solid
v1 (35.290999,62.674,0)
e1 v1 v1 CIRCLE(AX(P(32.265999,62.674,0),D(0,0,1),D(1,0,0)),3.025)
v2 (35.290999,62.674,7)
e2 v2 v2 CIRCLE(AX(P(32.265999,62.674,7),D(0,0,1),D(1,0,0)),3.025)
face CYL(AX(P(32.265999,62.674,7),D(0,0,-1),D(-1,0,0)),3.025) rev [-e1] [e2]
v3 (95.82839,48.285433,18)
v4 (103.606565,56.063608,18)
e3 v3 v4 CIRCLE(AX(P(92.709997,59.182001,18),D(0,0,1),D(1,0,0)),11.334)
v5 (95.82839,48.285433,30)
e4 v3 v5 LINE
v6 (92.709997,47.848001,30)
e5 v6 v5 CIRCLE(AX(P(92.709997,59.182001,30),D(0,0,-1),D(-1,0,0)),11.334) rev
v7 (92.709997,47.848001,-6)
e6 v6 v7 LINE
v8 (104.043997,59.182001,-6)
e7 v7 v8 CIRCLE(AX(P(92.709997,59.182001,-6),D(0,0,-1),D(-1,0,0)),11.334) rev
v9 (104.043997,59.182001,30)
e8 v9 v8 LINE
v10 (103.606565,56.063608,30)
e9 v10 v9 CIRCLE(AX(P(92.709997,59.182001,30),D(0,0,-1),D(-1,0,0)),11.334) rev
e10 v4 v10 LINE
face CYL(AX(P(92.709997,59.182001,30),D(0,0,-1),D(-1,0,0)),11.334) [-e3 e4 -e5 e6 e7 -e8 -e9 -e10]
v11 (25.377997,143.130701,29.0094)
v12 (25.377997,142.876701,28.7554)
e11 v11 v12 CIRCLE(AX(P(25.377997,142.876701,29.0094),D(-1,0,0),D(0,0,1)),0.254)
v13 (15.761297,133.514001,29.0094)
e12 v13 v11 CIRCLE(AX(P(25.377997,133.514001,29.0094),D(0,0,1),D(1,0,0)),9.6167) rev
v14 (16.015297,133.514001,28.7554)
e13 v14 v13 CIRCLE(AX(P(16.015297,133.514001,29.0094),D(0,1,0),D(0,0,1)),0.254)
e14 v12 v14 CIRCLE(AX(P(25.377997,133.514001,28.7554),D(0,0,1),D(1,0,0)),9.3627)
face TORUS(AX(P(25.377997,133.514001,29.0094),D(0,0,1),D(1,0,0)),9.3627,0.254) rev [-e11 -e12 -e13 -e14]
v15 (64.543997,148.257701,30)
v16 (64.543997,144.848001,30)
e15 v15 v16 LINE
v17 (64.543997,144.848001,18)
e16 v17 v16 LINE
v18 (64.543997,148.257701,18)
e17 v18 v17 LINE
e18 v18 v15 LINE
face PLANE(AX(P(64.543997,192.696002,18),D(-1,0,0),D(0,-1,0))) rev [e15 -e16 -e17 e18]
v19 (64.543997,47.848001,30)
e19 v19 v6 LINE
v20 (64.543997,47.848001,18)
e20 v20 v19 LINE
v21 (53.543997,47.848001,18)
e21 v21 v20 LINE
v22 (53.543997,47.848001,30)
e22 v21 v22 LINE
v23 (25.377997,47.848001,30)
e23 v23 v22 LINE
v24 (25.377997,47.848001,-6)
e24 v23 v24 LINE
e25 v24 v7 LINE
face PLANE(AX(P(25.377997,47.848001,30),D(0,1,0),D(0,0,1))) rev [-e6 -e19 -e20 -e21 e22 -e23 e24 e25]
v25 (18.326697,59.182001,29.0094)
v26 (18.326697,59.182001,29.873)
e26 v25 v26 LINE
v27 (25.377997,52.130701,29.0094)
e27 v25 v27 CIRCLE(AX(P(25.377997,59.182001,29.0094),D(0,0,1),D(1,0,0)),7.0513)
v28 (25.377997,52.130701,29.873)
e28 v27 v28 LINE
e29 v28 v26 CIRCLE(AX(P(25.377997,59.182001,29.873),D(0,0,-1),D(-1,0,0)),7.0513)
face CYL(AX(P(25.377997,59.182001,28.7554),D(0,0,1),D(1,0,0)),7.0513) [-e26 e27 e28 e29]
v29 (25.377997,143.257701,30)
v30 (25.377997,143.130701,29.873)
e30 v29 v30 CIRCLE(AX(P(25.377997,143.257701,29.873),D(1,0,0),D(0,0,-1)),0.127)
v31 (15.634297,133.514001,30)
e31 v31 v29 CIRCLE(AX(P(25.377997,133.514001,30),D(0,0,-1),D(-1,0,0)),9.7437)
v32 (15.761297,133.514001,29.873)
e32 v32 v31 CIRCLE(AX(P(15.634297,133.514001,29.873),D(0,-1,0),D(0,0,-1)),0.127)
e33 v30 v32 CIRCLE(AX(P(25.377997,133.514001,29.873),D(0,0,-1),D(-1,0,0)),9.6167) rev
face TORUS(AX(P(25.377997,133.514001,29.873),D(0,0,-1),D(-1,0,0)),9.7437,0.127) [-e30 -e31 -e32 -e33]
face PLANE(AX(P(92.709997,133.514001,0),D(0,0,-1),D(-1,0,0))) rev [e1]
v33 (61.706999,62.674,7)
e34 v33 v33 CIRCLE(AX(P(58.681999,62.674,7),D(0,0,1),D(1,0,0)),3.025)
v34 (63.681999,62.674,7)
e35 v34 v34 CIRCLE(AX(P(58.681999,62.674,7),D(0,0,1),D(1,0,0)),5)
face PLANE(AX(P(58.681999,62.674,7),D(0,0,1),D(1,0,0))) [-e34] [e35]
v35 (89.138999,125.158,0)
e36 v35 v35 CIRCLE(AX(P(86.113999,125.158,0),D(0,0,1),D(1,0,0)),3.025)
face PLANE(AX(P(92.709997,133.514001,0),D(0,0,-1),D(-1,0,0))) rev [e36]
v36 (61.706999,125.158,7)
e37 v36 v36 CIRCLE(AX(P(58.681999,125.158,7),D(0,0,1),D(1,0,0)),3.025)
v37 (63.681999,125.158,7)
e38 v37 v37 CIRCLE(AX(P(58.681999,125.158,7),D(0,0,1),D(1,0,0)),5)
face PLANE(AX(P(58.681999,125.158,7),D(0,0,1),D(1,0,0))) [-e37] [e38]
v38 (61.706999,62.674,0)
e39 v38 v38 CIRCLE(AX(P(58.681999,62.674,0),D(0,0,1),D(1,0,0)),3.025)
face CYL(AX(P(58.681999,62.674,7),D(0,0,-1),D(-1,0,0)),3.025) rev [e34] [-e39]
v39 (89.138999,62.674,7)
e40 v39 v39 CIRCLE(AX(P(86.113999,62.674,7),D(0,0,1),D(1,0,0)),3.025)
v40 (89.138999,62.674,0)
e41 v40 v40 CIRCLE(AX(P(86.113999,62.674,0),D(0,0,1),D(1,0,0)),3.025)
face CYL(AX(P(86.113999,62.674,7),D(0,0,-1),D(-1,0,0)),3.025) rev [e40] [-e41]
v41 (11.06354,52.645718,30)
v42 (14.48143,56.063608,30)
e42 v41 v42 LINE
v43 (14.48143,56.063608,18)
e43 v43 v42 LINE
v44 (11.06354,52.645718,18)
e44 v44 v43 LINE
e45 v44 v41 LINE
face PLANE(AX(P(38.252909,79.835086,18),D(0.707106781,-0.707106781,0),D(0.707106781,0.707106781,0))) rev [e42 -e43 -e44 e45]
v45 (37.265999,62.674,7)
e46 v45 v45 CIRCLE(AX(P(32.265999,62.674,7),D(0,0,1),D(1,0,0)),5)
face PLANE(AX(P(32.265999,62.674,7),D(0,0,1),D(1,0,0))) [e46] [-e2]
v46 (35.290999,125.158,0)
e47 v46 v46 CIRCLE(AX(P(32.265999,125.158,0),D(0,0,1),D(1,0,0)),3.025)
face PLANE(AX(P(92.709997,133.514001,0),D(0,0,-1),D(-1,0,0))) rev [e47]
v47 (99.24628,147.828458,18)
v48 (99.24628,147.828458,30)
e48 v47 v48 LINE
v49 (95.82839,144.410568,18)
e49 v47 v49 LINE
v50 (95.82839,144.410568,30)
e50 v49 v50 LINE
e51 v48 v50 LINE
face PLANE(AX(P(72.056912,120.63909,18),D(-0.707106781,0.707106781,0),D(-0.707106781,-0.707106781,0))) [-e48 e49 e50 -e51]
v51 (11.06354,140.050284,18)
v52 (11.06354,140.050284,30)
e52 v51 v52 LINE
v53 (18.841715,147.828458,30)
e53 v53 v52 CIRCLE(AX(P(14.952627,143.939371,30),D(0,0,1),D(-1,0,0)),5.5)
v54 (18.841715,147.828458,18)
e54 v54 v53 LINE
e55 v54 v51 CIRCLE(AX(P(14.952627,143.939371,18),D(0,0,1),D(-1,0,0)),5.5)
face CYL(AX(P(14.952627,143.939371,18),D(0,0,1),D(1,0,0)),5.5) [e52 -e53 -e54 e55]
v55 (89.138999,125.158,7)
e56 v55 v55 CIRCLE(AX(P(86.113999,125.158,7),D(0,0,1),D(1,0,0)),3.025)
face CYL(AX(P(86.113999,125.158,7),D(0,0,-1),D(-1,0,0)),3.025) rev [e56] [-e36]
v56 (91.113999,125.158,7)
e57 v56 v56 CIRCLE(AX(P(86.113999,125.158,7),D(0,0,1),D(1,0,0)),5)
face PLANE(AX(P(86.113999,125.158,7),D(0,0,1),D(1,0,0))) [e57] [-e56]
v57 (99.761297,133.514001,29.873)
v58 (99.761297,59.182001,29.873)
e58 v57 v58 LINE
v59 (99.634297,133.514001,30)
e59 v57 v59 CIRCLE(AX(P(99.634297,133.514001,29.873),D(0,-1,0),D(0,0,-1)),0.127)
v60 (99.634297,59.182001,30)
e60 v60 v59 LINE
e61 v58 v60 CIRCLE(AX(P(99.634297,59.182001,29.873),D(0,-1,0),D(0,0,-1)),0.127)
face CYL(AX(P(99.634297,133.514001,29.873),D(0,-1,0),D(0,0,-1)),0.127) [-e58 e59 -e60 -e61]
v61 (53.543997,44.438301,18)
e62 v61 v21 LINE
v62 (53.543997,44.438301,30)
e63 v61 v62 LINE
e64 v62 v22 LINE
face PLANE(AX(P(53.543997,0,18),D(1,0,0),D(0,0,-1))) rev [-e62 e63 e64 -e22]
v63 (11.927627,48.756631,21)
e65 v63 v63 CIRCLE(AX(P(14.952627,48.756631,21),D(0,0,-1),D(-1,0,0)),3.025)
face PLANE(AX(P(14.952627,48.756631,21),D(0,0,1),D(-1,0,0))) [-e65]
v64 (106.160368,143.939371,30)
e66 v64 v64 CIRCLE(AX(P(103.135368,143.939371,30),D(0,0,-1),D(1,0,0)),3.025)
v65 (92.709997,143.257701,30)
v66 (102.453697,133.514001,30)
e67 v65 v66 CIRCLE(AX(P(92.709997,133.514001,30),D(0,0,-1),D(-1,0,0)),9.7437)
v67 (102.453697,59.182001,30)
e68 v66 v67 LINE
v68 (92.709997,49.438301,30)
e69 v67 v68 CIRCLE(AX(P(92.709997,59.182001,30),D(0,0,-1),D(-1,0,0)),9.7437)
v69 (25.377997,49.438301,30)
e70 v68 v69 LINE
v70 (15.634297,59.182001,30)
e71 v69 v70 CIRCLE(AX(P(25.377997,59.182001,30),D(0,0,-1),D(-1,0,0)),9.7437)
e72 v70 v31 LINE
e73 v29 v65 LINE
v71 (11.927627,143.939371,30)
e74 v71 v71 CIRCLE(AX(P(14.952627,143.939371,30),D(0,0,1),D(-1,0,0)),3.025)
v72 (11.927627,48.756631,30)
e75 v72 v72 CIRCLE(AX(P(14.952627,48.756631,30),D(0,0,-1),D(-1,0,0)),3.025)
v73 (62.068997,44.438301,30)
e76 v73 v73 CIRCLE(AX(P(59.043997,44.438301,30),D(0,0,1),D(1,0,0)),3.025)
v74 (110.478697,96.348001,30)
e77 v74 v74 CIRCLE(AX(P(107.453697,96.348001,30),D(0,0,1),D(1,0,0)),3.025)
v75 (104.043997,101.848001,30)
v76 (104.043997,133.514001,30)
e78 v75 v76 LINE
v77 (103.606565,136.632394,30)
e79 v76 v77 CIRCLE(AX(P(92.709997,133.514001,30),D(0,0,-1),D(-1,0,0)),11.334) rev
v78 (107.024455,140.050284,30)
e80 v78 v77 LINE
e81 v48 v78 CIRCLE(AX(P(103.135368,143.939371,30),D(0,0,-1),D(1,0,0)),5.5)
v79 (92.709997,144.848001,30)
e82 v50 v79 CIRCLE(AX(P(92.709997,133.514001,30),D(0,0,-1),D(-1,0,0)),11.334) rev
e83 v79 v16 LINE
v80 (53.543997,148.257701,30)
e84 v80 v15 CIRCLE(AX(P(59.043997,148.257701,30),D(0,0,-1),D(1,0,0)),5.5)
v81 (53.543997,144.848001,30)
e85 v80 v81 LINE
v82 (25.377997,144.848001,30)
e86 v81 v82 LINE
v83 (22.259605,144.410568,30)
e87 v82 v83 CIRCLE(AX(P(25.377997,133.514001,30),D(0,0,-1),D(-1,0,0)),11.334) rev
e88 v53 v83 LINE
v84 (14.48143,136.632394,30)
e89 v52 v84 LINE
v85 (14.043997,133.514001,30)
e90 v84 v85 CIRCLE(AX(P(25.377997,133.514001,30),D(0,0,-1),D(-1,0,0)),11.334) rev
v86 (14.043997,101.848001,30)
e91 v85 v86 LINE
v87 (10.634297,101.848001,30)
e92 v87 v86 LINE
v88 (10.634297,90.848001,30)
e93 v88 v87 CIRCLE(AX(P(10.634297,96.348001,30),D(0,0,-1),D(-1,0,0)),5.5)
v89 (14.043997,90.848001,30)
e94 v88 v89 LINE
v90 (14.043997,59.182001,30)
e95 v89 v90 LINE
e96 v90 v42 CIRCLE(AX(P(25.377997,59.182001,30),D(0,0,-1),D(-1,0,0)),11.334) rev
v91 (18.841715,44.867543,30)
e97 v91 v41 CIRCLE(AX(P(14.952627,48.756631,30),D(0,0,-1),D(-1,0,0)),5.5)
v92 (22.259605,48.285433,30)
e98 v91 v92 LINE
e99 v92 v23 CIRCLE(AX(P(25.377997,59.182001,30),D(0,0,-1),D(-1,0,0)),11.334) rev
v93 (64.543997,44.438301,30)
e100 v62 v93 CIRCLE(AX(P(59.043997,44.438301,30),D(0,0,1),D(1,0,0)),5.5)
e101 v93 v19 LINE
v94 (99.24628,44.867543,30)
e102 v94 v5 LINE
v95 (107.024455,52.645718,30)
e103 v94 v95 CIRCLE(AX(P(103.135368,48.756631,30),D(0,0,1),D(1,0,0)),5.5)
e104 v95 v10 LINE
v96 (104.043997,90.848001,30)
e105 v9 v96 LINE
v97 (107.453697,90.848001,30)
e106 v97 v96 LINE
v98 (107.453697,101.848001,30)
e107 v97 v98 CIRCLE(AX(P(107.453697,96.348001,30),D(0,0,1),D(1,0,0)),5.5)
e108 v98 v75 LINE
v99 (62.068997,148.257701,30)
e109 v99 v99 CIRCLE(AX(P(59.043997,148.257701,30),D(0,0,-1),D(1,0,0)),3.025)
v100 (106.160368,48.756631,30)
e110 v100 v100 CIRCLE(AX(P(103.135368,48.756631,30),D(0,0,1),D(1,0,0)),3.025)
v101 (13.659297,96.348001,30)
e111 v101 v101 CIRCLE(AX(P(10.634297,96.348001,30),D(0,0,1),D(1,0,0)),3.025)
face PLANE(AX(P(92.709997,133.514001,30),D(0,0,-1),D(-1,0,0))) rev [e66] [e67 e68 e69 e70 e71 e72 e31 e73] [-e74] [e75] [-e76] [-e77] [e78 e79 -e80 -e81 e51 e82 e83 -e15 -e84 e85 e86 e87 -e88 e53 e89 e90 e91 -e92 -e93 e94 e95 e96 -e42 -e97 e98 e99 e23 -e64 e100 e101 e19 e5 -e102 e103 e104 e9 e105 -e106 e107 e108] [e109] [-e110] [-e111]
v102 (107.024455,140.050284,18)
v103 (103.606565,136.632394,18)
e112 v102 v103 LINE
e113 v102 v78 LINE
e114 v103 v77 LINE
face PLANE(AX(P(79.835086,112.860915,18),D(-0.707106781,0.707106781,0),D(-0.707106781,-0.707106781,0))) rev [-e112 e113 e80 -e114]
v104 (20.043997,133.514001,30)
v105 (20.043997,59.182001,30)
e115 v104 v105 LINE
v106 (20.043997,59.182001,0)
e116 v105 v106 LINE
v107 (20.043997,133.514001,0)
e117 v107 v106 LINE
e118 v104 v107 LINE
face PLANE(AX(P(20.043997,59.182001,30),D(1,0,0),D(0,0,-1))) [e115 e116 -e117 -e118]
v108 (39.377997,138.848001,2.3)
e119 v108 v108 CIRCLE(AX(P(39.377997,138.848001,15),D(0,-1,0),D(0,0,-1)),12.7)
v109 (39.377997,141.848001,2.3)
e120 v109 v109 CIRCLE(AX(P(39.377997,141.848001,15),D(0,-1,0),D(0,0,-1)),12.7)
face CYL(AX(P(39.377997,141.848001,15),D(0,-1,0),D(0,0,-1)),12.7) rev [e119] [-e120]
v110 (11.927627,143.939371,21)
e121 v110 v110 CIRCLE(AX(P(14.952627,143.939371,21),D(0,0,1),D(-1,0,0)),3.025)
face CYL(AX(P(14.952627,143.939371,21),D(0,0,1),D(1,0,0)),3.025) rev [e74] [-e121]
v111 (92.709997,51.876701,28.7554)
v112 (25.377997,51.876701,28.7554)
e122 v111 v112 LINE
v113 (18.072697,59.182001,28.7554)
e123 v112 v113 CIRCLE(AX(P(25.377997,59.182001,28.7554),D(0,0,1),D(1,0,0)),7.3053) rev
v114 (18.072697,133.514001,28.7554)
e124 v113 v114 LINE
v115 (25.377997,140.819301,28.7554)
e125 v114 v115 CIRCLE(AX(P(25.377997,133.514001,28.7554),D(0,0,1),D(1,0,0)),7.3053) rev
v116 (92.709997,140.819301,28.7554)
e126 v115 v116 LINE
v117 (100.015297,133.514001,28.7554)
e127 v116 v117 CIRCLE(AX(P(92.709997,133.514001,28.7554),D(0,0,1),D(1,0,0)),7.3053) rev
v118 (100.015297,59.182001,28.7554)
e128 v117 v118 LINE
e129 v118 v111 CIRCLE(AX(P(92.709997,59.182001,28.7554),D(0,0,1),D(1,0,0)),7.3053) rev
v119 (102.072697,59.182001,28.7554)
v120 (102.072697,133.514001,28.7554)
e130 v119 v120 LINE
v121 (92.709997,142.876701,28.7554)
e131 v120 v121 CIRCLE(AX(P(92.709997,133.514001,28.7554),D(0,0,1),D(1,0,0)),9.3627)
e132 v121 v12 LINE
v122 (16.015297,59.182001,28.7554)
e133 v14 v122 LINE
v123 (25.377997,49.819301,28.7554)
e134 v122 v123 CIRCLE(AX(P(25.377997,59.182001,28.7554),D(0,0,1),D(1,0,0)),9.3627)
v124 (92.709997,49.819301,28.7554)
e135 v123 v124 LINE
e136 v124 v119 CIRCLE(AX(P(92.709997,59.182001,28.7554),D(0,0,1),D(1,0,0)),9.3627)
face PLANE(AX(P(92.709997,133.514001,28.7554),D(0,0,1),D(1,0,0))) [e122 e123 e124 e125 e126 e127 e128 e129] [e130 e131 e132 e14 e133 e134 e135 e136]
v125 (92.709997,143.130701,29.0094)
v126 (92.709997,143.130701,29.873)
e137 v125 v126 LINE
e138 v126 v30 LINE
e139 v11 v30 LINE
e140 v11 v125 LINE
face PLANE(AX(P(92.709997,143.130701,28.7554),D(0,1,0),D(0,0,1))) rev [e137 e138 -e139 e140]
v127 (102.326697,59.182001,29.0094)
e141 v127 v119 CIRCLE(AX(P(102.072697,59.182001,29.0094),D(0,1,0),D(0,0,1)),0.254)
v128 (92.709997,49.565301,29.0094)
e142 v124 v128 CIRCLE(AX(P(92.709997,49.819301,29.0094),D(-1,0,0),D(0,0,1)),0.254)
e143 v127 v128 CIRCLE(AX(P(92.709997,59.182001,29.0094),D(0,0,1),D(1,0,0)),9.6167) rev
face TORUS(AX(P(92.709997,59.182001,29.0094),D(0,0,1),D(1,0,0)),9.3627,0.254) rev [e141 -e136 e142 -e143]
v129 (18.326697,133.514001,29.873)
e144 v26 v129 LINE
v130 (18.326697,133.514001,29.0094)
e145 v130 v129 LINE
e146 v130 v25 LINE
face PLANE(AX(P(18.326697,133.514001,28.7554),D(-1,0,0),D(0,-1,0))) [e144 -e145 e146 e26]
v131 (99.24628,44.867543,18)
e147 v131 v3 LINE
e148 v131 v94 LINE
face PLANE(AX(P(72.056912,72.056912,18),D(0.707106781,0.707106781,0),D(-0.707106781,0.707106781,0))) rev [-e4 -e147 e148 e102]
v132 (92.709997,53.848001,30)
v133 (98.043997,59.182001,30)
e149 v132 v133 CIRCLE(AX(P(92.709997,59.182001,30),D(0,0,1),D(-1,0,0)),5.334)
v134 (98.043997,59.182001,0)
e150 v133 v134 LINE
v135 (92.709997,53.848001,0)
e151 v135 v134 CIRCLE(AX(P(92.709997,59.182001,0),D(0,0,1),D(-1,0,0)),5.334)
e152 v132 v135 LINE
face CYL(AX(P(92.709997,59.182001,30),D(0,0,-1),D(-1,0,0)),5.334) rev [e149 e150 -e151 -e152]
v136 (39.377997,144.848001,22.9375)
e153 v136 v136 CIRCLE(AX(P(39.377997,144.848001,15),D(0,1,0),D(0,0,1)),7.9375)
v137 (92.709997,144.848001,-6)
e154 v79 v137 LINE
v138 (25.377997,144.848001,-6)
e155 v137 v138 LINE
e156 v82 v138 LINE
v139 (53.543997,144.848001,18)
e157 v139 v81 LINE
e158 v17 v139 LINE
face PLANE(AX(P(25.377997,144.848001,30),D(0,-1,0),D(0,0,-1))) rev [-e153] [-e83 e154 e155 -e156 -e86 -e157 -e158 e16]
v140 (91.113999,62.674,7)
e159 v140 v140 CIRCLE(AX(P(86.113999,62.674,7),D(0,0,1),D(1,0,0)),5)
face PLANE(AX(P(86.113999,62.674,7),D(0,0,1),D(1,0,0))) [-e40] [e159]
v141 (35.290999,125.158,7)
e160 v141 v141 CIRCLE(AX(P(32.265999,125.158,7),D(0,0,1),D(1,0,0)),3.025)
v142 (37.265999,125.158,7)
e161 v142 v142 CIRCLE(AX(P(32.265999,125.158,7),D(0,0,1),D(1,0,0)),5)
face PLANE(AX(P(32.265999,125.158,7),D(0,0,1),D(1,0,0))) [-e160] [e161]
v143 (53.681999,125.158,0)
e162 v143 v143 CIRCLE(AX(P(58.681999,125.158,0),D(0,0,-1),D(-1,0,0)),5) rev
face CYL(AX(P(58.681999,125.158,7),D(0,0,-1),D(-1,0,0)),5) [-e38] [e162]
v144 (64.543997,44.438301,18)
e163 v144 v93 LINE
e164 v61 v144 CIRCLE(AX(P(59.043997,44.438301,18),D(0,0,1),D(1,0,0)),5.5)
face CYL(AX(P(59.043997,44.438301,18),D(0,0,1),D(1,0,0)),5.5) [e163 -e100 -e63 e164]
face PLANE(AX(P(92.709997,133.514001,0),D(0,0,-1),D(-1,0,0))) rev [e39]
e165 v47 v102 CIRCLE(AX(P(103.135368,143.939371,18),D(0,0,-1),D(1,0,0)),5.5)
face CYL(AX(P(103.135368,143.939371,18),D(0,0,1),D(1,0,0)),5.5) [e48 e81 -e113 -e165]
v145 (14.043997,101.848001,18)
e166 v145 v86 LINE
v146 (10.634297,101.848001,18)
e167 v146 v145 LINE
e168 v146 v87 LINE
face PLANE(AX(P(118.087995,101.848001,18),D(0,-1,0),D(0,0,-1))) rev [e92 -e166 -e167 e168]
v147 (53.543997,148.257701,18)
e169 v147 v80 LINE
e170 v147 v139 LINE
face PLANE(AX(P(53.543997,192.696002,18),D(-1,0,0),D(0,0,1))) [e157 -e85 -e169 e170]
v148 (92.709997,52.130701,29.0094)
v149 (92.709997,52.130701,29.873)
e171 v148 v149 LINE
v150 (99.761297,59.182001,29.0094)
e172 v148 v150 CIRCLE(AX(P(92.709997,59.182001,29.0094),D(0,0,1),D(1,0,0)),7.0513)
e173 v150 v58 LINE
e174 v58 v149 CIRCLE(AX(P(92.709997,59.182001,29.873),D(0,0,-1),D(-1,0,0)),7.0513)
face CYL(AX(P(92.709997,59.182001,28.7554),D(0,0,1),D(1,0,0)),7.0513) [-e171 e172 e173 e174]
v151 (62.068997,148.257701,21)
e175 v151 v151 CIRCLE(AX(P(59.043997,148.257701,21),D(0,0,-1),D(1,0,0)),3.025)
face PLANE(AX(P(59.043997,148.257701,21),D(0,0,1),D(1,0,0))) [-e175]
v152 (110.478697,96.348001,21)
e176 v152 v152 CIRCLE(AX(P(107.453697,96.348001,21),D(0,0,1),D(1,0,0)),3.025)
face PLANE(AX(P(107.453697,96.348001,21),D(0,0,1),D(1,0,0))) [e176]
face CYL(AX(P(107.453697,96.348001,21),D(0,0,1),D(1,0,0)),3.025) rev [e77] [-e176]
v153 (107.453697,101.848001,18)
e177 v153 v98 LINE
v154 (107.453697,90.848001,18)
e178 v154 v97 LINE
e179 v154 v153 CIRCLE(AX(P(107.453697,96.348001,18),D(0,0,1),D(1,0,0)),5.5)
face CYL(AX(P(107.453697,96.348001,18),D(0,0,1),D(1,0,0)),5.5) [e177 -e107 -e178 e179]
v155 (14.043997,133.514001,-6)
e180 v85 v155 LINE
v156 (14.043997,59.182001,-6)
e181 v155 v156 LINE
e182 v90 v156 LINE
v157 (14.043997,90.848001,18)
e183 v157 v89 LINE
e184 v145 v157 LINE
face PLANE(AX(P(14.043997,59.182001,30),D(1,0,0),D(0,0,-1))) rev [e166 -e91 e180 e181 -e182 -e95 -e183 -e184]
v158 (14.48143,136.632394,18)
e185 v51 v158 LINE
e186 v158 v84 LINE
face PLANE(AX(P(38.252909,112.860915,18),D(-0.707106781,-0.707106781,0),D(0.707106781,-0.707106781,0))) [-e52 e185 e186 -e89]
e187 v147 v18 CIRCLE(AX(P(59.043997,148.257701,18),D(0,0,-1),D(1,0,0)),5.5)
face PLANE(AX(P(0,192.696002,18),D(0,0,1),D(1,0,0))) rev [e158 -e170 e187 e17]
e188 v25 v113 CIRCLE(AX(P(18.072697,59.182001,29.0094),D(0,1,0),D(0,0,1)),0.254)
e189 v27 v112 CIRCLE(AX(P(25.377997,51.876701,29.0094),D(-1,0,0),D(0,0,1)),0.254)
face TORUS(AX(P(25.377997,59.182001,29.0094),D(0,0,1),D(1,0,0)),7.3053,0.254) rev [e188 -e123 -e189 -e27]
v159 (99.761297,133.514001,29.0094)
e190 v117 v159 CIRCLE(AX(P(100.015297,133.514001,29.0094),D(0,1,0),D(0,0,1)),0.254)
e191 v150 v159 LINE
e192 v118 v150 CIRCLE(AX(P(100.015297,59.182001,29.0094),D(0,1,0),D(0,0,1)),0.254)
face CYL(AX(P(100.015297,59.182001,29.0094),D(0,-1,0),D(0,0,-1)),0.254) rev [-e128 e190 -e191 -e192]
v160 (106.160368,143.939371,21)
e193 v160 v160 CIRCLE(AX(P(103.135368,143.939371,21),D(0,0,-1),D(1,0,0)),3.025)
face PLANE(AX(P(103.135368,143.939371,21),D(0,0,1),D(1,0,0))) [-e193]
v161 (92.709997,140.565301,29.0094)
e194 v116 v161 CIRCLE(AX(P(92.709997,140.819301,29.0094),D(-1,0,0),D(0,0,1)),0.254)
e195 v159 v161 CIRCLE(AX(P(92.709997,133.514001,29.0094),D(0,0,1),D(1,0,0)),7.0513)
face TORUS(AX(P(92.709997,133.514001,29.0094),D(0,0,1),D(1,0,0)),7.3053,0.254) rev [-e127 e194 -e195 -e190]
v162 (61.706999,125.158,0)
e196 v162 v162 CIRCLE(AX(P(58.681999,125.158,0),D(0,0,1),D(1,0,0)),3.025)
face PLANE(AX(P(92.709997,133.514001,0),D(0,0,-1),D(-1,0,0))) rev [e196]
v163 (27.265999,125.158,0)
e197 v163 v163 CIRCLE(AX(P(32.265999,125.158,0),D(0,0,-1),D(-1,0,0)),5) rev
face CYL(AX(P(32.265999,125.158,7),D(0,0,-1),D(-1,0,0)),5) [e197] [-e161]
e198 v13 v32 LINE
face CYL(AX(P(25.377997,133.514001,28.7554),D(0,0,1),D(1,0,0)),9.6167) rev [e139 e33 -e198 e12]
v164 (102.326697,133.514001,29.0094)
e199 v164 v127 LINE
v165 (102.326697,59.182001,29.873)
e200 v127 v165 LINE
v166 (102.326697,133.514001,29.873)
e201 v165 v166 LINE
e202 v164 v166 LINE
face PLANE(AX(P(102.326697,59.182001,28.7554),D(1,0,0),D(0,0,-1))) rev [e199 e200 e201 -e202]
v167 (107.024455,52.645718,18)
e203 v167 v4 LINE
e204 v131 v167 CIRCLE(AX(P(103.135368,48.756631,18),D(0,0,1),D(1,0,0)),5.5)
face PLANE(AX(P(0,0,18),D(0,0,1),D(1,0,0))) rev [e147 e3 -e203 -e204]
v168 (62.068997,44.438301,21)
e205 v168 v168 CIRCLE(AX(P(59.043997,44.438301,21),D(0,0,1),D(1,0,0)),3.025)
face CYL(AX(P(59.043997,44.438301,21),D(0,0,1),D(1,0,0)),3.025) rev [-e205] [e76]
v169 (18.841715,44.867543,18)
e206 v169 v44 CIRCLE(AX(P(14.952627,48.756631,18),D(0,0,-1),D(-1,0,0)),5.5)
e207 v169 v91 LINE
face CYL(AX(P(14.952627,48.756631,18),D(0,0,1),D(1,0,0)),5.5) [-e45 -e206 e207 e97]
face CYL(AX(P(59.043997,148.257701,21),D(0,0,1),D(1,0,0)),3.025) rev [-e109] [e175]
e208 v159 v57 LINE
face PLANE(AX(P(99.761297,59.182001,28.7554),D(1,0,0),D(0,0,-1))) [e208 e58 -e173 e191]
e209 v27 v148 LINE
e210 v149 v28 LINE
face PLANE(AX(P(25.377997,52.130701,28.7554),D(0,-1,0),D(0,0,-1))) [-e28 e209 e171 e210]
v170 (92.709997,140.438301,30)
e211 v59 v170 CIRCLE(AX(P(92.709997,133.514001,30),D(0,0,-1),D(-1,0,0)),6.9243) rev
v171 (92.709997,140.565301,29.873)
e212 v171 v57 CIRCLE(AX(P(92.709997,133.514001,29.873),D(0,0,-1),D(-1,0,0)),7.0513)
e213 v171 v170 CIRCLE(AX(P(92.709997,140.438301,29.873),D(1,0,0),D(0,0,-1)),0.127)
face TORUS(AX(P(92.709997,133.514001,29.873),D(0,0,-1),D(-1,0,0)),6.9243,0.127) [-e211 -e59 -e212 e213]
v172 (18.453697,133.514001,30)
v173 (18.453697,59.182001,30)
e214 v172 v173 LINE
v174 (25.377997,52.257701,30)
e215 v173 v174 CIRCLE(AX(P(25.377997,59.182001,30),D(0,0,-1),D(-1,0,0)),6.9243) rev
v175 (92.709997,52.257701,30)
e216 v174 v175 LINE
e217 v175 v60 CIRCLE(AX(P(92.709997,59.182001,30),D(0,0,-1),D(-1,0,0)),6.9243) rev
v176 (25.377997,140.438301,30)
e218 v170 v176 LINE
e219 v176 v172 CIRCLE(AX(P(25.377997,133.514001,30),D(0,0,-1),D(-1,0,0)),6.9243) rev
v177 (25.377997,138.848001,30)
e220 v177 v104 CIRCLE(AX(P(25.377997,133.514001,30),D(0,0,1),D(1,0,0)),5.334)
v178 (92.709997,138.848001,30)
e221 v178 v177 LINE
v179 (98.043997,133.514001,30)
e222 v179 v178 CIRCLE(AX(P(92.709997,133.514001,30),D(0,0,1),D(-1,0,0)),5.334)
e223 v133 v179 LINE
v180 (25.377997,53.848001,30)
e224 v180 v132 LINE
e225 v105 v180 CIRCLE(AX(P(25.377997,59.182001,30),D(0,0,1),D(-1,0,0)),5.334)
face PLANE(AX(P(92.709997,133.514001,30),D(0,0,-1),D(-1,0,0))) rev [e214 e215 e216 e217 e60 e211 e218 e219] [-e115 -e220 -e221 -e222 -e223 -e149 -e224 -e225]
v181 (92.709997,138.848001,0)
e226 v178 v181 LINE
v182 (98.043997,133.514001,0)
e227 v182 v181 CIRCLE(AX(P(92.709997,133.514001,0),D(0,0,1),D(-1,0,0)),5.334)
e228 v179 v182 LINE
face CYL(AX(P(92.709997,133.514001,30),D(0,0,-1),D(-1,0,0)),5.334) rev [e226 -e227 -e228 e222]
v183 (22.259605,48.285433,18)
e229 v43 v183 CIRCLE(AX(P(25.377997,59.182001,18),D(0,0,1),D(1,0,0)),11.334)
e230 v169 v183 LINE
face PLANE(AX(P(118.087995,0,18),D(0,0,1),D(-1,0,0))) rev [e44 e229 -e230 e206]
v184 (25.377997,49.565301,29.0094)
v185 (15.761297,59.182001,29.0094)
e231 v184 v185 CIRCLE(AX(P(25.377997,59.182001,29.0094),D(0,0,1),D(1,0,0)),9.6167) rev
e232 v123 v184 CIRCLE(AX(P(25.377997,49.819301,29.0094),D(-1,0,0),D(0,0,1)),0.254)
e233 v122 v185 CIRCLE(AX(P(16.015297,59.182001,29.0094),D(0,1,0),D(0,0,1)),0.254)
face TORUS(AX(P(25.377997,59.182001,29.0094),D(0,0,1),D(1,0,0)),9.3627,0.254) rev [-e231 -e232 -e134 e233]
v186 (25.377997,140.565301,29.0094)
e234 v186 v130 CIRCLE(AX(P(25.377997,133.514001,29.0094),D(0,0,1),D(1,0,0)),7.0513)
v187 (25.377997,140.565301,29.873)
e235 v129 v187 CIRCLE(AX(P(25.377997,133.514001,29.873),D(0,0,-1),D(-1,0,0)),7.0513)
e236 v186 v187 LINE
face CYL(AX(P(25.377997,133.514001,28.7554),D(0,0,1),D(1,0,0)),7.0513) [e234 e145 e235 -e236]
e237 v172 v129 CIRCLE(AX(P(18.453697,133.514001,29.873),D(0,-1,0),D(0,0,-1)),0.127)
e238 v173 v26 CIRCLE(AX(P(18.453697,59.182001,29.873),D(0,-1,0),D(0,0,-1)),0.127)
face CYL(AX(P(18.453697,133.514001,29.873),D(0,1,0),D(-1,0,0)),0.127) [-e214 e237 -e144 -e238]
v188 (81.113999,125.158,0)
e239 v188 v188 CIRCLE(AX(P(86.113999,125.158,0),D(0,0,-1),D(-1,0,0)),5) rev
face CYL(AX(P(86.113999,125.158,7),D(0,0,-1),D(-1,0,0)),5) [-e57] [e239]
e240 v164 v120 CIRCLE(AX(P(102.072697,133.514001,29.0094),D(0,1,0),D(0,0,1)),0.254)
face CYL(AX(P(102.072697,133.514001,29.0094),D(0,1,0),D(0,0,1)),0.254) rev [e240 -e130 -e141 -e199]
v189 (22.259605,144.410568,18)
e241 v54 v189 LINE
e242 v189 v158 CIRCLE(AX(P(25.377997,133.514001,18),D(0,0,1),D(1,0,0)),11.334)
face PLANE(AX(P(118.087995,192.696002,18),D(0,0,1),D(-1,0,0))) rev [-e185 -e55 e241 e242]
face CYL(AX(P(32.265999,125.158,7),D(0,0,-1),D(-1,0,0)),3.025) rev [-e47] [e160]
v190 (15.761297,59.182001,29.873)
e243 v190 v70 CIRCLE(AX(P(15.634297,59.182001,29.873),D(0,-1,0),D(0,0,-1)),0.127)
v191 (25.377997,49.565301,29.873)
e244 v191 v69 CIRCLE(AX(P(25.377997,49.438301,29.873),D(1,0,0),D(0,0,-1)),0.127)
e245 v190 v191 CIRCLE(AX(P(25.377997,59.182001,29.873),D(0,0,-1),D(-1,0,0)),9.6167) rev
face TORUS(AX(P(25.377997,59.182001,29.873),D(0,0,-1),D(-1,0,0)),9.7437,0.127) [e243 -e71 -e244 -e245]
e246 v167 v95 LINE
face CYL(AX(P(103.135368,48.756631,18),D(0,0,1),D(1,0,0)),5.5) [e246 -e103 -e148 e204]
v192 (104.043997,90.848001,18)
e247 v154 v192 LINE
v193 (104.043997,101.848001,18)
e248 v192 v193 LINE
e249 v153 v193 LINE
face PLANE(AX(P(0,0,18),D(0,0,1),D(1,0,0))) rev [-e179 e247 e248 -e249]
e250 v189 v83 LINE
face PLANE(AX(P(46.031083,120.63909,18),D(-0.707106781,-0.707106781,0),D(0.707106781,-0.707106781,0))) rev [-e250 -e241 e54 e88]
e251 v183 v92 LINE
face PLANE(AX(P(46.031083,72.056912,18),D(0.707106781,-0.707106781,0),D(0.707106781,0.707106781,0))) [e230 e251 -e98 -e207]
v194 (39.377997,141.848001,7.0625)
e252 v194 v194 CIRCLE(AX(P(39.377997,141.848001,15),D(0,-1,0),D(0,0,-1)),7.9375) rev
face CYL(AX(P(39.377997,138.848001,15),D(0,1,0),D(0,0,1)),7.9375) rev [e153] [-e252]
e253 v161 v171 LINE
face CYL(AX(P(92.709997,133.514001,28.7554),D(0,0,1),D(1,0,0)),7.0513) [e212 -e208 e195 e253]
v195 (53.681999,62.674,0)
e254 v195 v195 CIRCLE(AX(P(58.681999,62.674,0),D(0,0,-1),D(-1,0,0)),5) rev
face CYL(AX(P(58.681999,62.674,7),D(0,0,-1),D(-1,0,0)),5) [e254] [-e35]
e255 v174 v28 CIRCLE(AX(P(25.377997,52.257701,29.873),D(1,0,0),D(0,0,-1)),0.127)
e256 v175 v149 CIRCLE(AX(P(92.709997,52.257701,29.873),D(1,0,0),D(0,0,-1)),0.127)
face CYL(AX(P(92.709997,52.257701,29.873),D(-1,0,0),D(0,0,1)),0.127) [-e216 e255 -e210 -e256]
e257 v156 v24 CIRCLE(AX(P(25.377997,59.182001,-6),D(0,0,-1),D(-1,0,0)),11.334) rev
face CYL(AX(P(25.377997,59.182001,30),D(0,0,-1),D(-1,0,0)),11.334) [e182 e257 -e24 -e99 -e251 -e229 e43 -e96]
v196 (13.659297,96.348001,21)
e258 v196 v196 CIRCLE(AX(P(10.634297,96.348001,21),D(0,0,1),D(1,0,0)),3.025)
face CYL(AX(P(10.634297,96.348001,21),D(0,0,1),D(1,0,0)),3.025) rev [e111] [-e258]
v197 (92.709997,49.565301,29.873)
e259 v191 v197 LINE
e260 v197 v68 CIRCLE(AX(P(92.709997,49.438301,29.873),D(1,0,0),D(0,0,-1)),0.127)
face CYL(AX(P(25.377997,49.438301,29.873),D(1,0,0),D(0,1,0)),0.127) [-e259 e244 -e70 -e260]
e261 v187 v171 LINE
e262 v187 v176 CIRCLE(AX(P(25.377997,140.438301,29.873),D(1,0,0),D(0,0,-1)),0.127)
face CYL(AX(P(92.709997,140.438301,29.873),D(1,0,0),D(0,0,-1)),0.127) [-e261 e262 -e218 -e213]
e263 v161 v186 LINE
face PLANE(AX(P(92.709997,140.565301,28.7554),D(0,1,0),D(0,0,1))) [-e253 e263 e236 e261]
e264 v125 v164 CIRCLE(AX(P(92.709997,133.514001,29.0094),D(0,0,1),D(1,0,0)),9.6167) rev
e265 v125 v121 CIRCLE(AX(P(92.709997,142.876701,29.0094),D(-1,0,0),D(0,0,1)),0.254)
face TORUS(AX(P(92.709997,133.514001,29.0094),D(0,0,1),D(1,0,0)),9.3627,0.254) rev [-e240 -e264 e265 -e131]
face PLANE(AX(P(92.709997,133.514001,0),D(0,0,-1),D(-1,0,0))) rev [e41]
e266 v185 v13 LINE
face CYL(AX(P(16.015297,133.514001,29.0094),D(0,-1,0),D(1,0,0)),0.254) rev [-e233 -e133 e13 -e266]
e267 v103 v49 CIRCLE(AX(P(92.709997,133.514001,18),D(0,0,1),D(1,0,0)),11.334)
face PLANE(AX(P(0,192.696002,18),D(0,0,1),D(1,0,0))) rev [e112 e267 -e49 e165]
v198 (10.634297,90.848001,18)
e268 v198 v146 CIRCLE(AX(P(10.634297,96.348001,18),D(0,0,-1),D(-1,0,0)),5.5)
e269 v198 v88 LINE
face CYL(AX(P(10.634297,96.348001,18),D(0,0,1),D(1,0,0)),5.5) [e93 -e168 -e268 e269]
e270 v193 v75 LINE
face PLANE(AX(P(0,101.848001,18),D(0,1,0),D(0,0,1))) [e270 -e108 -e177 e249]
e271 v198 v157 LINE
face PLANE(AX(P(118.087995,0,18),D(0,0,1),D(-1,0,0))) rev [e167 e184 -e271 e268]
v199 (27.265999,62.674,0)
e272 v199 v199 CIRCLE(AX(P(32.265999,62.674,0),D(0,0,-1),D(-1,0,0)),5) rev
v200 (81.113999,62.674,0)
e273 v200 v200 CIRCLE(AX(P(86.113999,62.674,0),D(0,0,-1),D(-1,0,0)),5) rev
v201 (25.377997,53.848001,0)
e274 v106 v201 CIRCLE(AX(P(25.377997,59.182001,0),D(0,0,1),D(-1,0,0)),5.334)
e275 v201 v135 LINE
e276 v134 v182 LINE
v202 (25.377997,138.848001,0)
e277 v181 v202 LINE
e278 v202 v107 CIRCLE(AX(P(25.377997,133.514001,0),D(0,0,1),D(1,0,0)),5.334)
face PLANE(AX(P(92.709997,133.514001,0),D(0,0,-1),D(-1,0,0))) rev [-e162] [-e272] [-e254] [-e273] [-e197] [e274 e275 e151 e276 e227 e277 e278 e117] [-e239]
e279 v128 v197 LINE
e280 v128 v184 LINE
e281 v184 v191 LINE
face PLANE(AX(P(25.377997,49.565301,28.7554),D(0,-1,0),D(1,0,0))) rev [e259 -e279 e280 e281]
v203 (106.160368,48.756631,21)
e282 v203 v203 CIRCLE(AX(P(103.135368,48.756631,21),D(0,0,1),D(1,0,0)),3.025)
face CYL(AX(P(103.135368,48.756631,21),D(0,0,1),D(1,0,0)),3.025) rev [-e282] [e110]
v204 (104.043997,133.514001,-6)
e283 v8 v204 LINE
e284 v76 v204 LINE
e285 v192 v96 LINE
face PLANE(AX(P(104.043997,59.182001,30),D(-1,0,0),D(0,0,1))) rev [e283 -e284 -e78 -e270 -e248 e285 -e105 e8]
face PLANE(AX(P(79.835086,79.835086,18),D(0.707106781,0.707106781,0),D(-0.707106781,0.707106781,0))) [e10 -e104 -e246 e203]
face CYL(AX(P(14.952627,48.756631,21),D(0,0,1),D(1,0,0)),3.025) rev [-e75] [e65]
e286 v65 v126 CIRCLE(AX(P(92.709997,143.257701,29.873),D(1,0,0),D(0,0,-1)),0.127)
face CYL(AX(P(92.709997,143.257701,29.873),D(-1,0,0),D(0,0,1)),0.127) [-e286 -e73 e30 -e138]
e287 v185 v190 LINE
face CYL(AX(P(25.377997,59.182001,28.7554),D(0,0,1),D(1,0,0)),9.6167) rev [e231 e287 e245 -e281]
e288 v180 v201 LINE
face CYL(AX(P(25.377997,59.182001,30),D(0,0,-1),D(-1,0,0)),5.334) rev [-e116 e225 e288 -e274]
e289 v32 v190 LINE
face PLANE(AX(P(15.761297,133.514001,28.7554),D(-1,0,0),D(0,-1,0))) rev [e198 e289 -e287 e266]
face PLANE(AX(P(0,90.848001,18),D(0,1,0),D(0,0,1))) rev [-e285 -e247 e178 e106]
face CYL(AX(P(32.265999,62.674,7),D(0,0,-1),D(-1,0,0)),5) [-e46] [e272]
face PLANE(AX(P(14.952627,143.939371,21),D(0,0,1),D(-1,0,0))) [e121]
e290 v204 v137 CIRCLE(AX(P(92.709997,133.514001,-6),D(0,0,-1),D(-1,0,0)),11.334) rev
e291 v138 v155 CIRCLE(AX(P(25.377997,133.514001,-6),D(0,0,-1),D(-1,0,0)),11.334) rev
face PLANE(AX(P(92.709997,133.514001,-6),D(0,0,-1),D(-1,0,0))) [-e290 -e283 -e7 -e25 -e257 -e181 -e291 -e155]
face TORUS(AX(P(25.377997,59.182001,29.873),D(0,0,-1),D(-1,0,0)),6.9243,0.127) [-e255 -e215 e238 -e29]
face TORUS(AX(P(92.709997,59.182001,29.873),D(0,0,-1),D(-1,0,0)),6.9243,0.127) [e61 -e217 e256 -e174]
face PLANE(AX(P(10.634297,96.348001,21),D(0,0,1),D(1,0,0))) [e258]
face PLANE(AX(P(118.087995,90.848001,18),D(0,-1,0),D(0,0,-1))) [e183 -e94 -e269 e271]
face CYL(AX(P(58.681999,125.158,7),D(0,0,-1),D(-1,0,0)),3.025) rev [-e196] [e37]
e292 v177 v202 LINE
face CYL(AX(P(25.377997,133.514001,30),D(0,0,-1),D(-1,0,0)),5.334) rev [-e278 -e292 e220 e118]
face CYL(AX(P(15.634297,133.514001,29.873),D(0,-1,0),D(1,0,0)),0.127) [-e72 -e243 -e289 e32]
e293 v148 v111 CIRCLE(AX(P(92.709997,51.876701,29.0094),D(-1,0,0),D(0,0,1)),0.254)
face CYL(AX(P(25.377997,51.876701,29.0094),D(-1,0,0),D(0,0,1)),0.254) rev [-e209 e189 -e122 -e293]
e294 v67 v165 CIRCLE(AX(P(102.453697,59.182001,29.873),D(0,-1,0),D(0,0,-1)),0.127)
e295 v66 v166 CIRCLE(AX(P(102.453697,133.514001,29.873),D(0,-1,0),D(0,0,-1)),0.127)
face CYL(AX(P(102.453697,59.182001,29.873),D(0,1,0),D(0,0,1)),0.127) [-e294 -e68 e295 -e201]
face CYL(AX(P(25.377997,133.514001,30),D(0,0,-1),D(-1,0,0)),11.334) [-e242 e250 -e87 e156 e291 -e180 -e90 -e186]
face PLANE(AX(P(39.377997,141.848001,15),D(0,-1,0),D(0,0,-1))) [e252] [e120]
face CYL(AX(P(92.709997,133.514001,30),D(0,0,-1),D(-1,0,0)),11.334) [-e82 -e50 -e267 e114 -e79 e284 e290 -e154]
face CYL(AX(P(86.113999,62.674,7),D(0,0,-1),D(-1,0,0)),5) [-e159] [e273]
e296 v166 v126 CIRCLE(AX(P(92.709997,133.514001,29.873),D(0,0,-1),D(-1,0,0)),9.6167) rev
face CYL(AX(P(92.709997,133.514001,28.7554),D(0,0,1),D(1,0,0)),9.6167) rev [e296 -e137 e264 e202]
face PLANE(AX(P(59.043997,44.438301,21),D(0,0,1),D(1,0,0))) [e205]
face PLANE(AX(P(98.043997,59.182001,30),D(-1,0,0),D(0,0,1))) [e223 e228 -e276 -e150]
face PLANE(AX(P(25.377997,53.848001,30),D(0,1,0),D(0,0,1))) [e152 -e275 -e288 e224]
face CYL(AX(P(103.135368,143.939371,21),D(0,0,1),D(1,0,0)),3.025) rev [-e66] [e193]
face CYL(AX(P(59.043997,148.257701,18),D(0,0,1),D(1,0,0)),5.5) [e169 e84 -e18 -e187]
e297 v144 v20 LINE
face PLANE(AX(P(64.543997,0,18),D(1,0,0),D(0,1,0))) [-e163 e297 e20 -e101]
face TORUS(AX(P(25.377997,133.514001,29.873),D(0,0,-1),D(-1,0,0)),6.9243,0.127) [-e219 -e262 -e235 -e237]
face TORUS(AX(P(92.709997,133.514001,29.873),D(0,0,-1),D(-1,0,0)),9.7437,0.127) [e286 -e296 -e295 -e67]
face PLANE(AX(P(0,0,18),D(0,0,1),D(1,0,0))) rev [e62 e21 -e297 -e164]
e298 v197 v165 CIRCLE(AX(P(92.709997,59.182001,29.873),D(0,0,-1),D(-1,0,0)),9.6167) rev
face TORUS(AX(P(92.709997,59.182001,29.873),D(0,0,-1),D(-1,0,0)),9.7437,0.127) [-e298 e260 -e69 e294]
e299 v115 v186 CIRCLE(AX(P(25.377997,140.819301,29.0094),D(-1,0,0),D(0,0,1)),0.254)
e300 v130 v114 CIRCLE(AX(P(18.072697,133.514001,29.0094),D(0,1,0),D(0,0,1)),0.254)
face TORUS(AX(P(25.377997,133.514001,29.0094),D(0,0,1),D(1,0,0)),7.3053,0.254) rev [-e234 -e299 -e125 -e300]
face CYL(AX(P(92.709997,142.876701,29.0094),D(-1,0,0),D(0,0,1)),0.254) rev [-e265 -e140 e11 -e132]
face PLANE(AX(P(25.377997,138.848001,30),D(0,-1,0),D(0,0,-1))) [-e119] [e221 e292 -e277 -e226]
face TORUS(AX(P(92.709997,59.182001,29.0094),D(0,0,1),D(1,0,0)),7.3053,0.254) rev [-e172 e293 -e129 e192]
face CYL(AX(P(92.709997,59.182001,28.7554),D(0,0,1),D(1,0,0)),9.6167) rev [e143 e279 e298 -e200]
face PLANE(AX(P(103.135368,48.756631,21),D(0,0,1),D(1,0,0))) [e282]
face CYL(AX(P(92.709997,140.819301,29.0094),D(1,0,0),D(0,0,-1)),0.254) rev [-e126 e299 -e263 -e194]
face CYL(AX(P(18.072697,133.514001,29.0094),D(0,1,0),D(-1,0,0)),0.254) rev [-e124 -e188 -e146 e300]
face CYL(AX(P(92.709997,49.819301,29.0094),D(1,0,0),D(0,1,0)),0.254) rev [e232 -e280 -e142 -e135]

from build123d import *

# Parameters (mm, degrees)
BOSS_EXTRUDE1_DEPTH     = 30
SHELL1_T                = 6
CUT_EXTRUDE4_DEPTH      = 1.2446
FILLET1_R               = 0.254
FILLET2_R               = 0.127
BOSS_EXTRUDE7_START     = -12
BOSS_EXTRUDE7_DEPTH     = 12
SKETCH17_R              = 3.025
CUT_EXTRUDE5_DEPTH      = 9
MIRROR3_START           = -12
MIRROR3_COPY_1_DEPTH    = 12
MIRROR3_COPY_2_SKETCH_R = 3.025
MIRROR3_COPY_2_DEPTH    = 9
BOSS_EXTRUDE8_DEPTH     = 12
SKETCH19_R              = 3.025
CUT_EXTRUDE6_DEPTH      = 9
BOSS_EXTRUDE9_DEPTH     = 12
SKETCH21_R              = 3.025
CUT_EXTRUDE9_DEPTH      = 9
CUT_EXTRUDE12_DEPTH     = 6
SKETCH28_R              = 5
SKETCH28_R_2            = 3.025
BOSS_EXTRUDE12_DEPTH    = 7
SKETCH29_R              = 12.7
CUT_EXTRUDE13_DEPTH     = 3
SKETCH30_R              = 3.025
CUT_EXTRUDE14_DEPTH     = 9


with BuildPart() as part:
    # Sketch2 → Boss-Extrude1 (new body)
    with BuildSketch(Plane.XY):
        with BuildLine():
            Line((25.377997498, 138.848000793), (92.709997498, 138.848000793))
            ThreePointArc((92.709997498, 138.848000793), (96.481705068, 137.285708364), (98.043997498, 133.514000793))
            Line((98.043997498, 133.514000793), (98.043997498, 59.182000793))
            ThreePointArc((98.043997498, 59.182000793), (96.481705068, 55.410293223), (92.709997498, 53.848000793))
            Line((92.709997498, 53.848000793), (25.377997498, 53.848000793))
            ThreePointArc((25.377997498, 53.848000793), (21.606289927, 55.410293223), (20.043997498, 59.182000793))
            Line((20.043997498, 59.182000793), (20.043997498, 133.514000793))
            ThreePointArc((20.043997498, 133.514000793), (21.606289927, 137.285708364), (25.377997498, 138.848000793))
        make_face()
    extrude(amount=BOSS_EXTRUDE1_DEPTH)

    # Shell1
    shell1_openings = [part.faces().sort_by_distance(p)[0] for p in [
        (59.043997498, 96.348000793, 30),
    ]]
    offset(amount=SHELL1_T, openings=shell1_openings, kind=Kind.INTERSECTION)

    # Sketch15 → Cut-Extrude4 (cut)
    with BuildSketch(Plane.XY.offset(30)):
        with BuildLine():
            Line((92.709997498, 143.130700793), (25.377997498, 143.130700793))
            ThreePointArc((25.377997498, 143.130700793), (18.577963715, 140.314034576), (15.761297498, 133.514000793))
            Line((15.761297498, 133.514000793), (15.761297498, 59.182000793))
            ThreePointArc((15.761297498, 59.182000793), (18.577963715, 52.381967011), (25.377997498, 49.565300793))
            Line((25.377997498, 49.565300793), (92.709997498, 49.565300793))
            ThreePointArc((92.709997498, 49.565300793), (99.51003128, 52.381967011), (102.326697498, 59.182000793))
            Line((102.326697498, 59.182000793), (102.326697498, 133.514000793))
            ThreePointArc((102.326697498, 133.514000793), (99.51003128, 140.314034576), (92.709997498, 143.130700793))
        make_face()
        with BuildLine():
            Line((18.326697498, 133.514000793), (18.326697498, 59.182000793))
            ThreePointArc((18.326697498, 59.182000793), (20.391975451, 54.195978747), (25.377997498, 52.130700793))
            Line((25.377997498, 52.130700793), (92.709997498, 52.130700793))
            ThreePointArc((92.709997498, 52.130700793), (97.696019544, 54.195978747), (99.761297498, 59.182000793))
            Line((99.761297498, 59.182000793), (99.761297498, 133.514000793))
            ThreePointArc((99.761297498, 133.514000793), (97.696019544, 138.50002284), (92.709997498, 140.565300793))
            Line((92.709997498, 140.565300793), (25.377997498, 140.565300793))
            ThreePointArc((25.377997498, 140.565300793), (20.391975451, 138.50002284), (18.326697498, 133.514000793))
        make_face(mode=Mode.SUBTRACT)
    extrude(amount=-CUT_EXTRUDE4_DEPTH, mode=Mode.SUBTRACT)

    # Fillet1
    fillet1_edges = [part.edges().sort_by_distance(p)[0] for p in [
        (99.51003128, 140.314034576, 28.7554),
        (102.326697498, 96.348000793, 28.7554),
        (99.51003128, 52.381967011, 28.7554),
        (59.043997498, 49.565300793, 28.7554),
        (18.577963715, 52.381967011, 28.7554),
        (15.761297498, 96.348000793, 28.7554),
        (18.577963715, 140.314034576, 28.7554),
        (59.043997498, 143.130700793, 28.7554),
        (59.043997498, 140.565300793, 28.7554),
        (20.391975451, 138.50002284, 28.7554),
        (18.326697498, 96.348000793, 28.7554),
        (20.391975451, 54.195978747, 28.7554),
        (59.043997498, 52.130700793, 28.7554),
        (97.696019544, 54.195978747, 28.7554),
        (99.761297498, 96.348000793, 28.7554),
        (97.696019544, 138.50002284, 28.7554),
    ]]
    fillet(fillet1_edges, radius=FILLET1_R)

    # Fillet2
    fillet2_edges = [part.edges().sort_by_distance(p)[0] for p in [
        (99.51003128, 140.314034576, 30),
        (59.043997498, 143.130700793, 30),
        (18.577963715, 140.314034576, 30),
        (15.761297498, 96.348000793, 30),
        (18.577963715, 52.381967011, 30),
        (59.043997498, 49.565300793, 30),
        (99.51003128, 52.381967011, 30),
        (102.326697498, 96.348000793, 30),
        (20.391975451, 138.50002284, 30),
        (59.043997498, 140.565300793, 30),
        (97.696019544, 138.50002284, 30),
        (99.761297498, 96.348000793, 30),
        (97.696019544, 54.195978747, 30),
        (59.043997498, 52.130700793, 30),
        (20.391975451, 54.195978747, 30),
        (18.326697498, 96.348000793, 30),
    ]]
    fillet(fillet2_edges, radius=FILLET2_R)

    # Sketch16 → Boss-Extrude7 (add)
    with BuildSketch(Plane.XY.offset(30).offset(BOSS_EXTRUDE7_START)):
        with BuildLine():
            Line((100.996369734, 50.895628557), (100.724345756, 51.167652535))
            ThreePointArc((100.724345756, 51.167652535), (99.274143504, 49.942328548), (97.639754878, 48.976264751))
            ThreePointArc((97.639754878, 48.976264751), (98.013010145, 46.753769441), (99.246280451, 44.867543247))
            ThreePointArc((99.246280451, 44.867543247), (103.135367747, 43.256630544), (107.024455044, 44.867543247))
            Line((107.024455044, 44.867543247), (105.27436576, 46.617632531))
            ThreePointArc((105.27436576, 46.617632531), (100.996369734, 46.617632531), (100.996369734, 50.895628557))
        make_face()
        with BuildLine():
            ThreePointArc((102.91573354, 54.252243414), (101.949669743, 52.617854787), (100.724345756, 51.167652535))
            Line((100.724345756, 51.167652535), (100.996369734, 50.895628557))
            ThreePointArc((100.996369734, 50.895628557), (104.29298513, 51.55136613), (106.160367747, 48.756630544))
            ThreePointArc((106.160367747, 48.756630544), (105.930103333, 47.599013161), (105.27436576, 46.617632531))
            Line((105.27436576, 46.617632531), (107.024455044, 44.867543247))
            ThreePointArc((107.024455044, 44.867543247), (108.216705176, 46.651871666), (108.635367747, 48.756630544))
            ThreePointArc((108.635367747, 48.756630544), (108.216705176, 50.861389422), (107.024455044, 52.64571784))
            ThreePointArc((107.024455044, 52.64571784), (105.13822885, 53.878988146), (102.91573354, 54.252243414))
        make_face()
        with BuildLine():
            Line((100.724345756, 51.167652535), (99.599833841, 52.29216445))
            ThreePointArc((99.599833841, 52.29216445), (98.909730925, 51.665153375), (98.162855601, 51.106975828))
            ThreePointArc((98.162855601, 51.106975828), (97.793982837, 50.067968501), (97.639754878, 48.976264751))
            ThreePointArc((97.639754878, 48.976264751), (99.274143504, 49.942328548), (100.724345756, 51.167652535))
        make_face()
        with BuildLine():
            ThreePointArc((100.785022463, 53.72914269), (100.226844916, 52.982267366), (99.599833841, 52.29216445))
            Line((99.599833841, 52.29216445), (100.724345756, 51.167652535))
            ThreePointArc((100.724345756, 51.167652535), (101.949669743, 52.617854787), (102.91573354, 54.252243414))
            ThreePointArc((102.91573354, 54.252243414), (101.82402979, 54.098015454), (100.785022463, 53.72914269))
        make_face()
        with BuildLine():
            Line((105.27436576, 46.617632531), (100.996369734, 50.895628557))
            ThreePointArc((100.996369734, 50.895628557), (100.996369734, 46.617632531), (105.27436576, 46.617632531))
        make_face()
        with BuildLine():
            ThreePointArc((106.160367747, 48.756630544), (104.29298513, 51.55136613), (100.996369734, 50.895628557))
            Line((100.996369734, 50.895628557), (105.27436576, 46.617632531))
            ThreePointArc((105.27436576, 46.617632531), (105.930103333, 47.599013161), (106.160367747, 48.756630544))
        make_face()
        with BuildLine():
            ThreePointArc((99.246280451, 44.867543247), (98.013010145, 46.753769441), (97.639754878, 48.976264751))
            ThreePointArc((97.639754878, 48.976264751), (96.748870179, 48.592049733), (95.828390347, 48.285433351))
            Line((95.828390347, 48.285433351), (99.246280451, 44.867543247))
        make_face()
        with BuildLine():
            ThreePointArc((103.60656494, 56.063607944), (103.299948558, 55.143128112), (102.91573354, 54.252243414))
            ThreePointArc((102.91573354, 54.252243414), (105.13822885, 53.878988146), (107.024455044, 52.64571784))
            Line((107.024455044, 52.64571784), (103.60656494, 56.063607944))
        make_face()
    boss_extrude7 = extrude(amount=BOSS_EXTRUDE7_DEPTH)

    # Sketch17 → Cut-Extrude5 (cut)
    with BuildSketch(Plane.XY.offset(30)):
        with Locations((103.135367747, 48.756630544)):
            Circle(SKETCH17_R)
    cut_extrude5 = extrude(amount=-CUT_EXTRUDE5_DEPTH, mode=Mode.SUBTRACT)

    # Mirror2: Boss-Extrude7, Cut-Extrude5 across plane
    add(boss_extrude7.mirror(Plane(origin=(0, 96.348000793, 0), x_dir=(0, 0, 1), z_dir=(0, -1, 0))))
    add(cut_extrude5.mirror(Plane(origin=(0, 96.348000793, 0), x_dir=(0, 0, 1), z_dir=(0, -1, 0))), mode=Mode.SUBTRACT)

    # Mirror3: Boss-Extrude7, Cut-Extrude5 across plane
    add(boss_extrude7.mirror(Plane(origin=(59.043997498, 0, 0), x_dir=(0, 0, 1), z_dir=(1, 0, 0))))
    add(cut_extrude5.mirror(Plane(origin=(59.043997498, 0, 0), x_dir=(0, 0, 1), z_dir=(1, 0, 0))), mode=Mode.SUBTRACT)

    # Mirror3 copy 1 sketch → Mirror3 copy 1 (add)
    with BuildSketch(Plane(origin=(118.087994995, 192.696001587, 30), x_dir=(-1, 0, 0), z_dir=(0, 0, 1)).offset(MIRROR3_START)):
        with BuildLine():
            Line((100.996369734, 50.895628557), (100.724345756, 51.167652535))
            ThreePointArc((100.724345756, 51.167652535), (99.274143504, 49.942328548), (97.639754878, 48.976264751))
            ThreePointArc((97.639754878, 48.976264751), (98.013010145, 46.753769441), (99.246280451, 44.867543247))
            ThreePointArc((99.246280451, 44.867543247), (103.135367747, 43.256630544), (107.024455044, 44.867543247))
            Line((107.024455044, 44.867543247), (105.27436576, 46.617632531))
            ThreePointArc((105.27436576, 46.617632531), (100.996369734, 46.617632531), (100.996369734, 50.895628557))
        make_face()
        with BuildLine():
            ThreePointArc((102.91573354, 54.252243414), (101.949669743, 52.617854787), (100.724345756, 51.167652535))
            Line((100.724345756, 51.167652535), (100.996369734, 50.895628557))
            ThreePointArc((100.996369734, 50.895628557), (104.29298513, 51.55136613), (106.160367747, 48.756630544))
            ThreePointArc((106.160367747, 48.756630544), (105.930103333, 47.599013161), (105.27436576, 46.617632531))
            Line((105.27436576, 46.617632531), (107.024455044, 44.867543247))
            ThreePointArc((107.024455044, 44.867543247), (108.216705176, 46.651871666), (108.635367747, 48.756630544))
            ThreePointArc((108.635367747, 48.756630544), (108.216705176, 50.861389422), (107.024455044, 52.64571784))
            ThreePointArc((107.024455044, 52.64571784), (105.13822885, 53.878988146), (102.91573354, 54.252243414))
        make_face()
        with BuildLine():
            Line((100.724345756, 51.167652535), (99.599833841, 52.29216445))
            ThreePointArc((99.599833841, 52.29216445), (98.909730925, 51.665153375), (98.162855601, 51.106975828))
            ThreePointArc((98.162855601, 51.106975828), (97.793982837, 50.067968501), (97.639754878, 48.976264751))
            ThreePointArc((97.639754878, 48.976264751), (99.274143504, 49.942328548), (100.724345756, 51.167652535))
        make_face()
        with BuildLine():
            ThreePointArc((100.785022463, 53.72914269), (100.226844916, 52.982267366), (99.599833841, 52.29216445))
            Line((99.599833841, 52.29216445), (100.724345756, 51.167652535))
            ThreePointArc((100.724345756, 51.167652535), (101.949669743, 52.617854787), (102.91573354, 54.252243414))
            ThreePointArc((102.91573354, 54.252243414), (101.82402979, 54.098015454), (100.785022463, 53.72914269))
        make_face()
        with BuildLine():
            Line((105.27436576, 46.617632531), (100.996369734, 50.895628557))
            ThreePointArc((100.996369734, 50.895628557), (100.996369734, 46.617632531), (105.27436576, 46.617632531))
        make_face()
        with BuildLine():
            ThreePointArc((106.160367747, 48.756630544), (104.29298513, 51.55136613), (100.996369734, 50.895628557))
            Line((100.996369734, 50.895628557), (105.27436576, 46.617632531))
            ThreePointArc((105.27436576, 46.617632531), (105.930103333, 47.599013161), (106.160367747, 48.756630544))
        make_face()
        with BuildLine():
            ThreePointArc((99.246280451, 44.867543247), (98.013010145, 46.753769441), (97.639754878, 48.976264751))
            ThreePointArc((97.639754878, 48.976264751), (96.748870179, 48.592049733), (95.828390347, 48.285433351))
            Line((95.828390347, 48.285433351), (99.246280451, 44.867543247))
        make_face()
        with BuildLine():
            ThreePointArc((103.60656494, 56.063607944), (103.299948558, 55.143128112), (102.91573354, 54.252243414))
            ThreePointArc((102.91573354, 54.252243414), (105.13822885, 53.878988146), (107.024455044, 52.64571784))
            Line((107.024455044, 52.64571784), (103.60656494, 56.063607944))
        make_face()
    extrude(amount=MIRROR3_COPY_1_DEPTH)

    # Mirror3 copy 2 sketch → Mirror3 copy 2 (cut)
    with BuildSketch(Plane(origin=(118.087994995, 192.696001587, 30), x_dir=(-1, 0, 0), z_dir=(0, 0, 1))):
        with Locations((103.135367747, 48.756630544)):
            Circle(MIRROR3_COPY_2_SKETCH_R)
    extrude(amount=-MIRROR3_COPY_2_DEPTH, mode=Mode.SUBTRACT)

    # Sketch18 → Boss-Extrude8 (add)
    with BuildSketch(Plane.XY.offset(30)):
        with BuildLine():
            Line((64.543997498, 47.848000793), (53.543997498, 47.848000793))
            Line((53.543997498, 47.848000793), (53.543997498, 44.438300793))
            ThreePointArc((53.543997498, 44.438300793), (59.043997498, 38.938300793), (64.543997498, 44.438300793))
            Line((64.543997498, 44.438300793), (64.543997498, 47.848000793))
        make_face()
    boss_extrude8 = extrude(amount=-BOSS_EXTRUDE8_DEPTH)

    # Sketch19 → Cut-Extrude6 (cut)
    with BuildSketch(Plane.XY.offset(30)):
        with Locations((59.043997498, 44.438300793)):
            Circle(SKETCH19_R)
    cut_extrude6 = extrude(amount=-CUT_EXTRUDE6_DEPTH, mode=Mode.SUBTRACT)

    # Mirror4: Boss-Extrude8, Cut-Extrude6 across plane
    add(boss_extrude8.mirror(Plane(origin=(0, 96.348000793, 0), x_dir=(0, 0, 1), z_dir=(0, -1, 0))))
    add(cut_extrude6.mirror(Plane(origin=(0, 96.348000793, 0), x_dir=(0, 0, 1), z_dir=(0, -1, 0))), mode=Mode.SUBTRACT)

    # Sketch20 → Boss-Extrude9 (add)
    with BuildSketch(Plane.XY.offset(30)):
        with BuildLine():
            Line((104.043997498, 101.848000793), (104.043997498, 90.848000793))
            Line((104.043997498, 90.848000793), (107.453697498, 90.848000793))
            ThreePointArc((107.453697498, 90.848000793), (112.953697498, 96.348000793), (107.453697498, 101.848000793))
            Line((107.453697498, 101.848000793), (104.043997498, 101.848000793))
        make_face()
    boss_extrude9 = extrude(amount=-BOSS_EXTRUDE9_DEPTH)

    # Mirror5: Boss-Extrude9 across plane
    add(boss_extrude9.mirror(Plane(origin=(59.043997498, 0, 0), x_dir=(0, 0, 1), z_dir=(1, 0, 0))))

    # Sketch21 → Cut-Extrude9 (cut)
    with BuildSketch(Plane.XY.offset(30)):
        with Locations((10.634297498, 96.348000793)):
            Circle(SKETCH21_R)
    extrude(amount=-CUT_EXTRUDE9_DEPTH, mode=Mode.SUBTRACT)

    # Sketch27 → Cut-Extrude12 (cut)
    with BuildSketch(Plane(origin=(0, 144.848000793, 0), x_dir=(1, 0, 0), z_dir=(0, 1, 0))):
        with BuildLine():
            ThreePointArc((46.726732508, -12), (39.377997498, -7.0625), (32.029262487, -12))
            Line((32.029262487, -12), (46.726732508, -12))
        make_face()
        with BuildLine():
            Line((46.726732508, -12), (32.029262487, -12))
            ThreePointArc((32.029262487, -12), (37.849383402, -22.788918102), (47.315497498, -15))
            ThreePointArc((47.315497498, -15), (47.166915599, -13.471385904), (46.726732508, -12))
        make_face()
    extrude(amount=-CUT_EXTRUDE12_DEPTH, mode=Mode.SUBTRACT)

    # Sketch28 → Boss-Extrude12 (add)
    # profile 1 of 6: a face of its own
    with BuildSketch(Plane.XY):
        with Locations(Location((32.265998756, 125.158, 0), (0, 0, 180))):
            Circle(SKETCH28_R)
        with Locations((32.265998756, 125.158)):
            Circle(SKETCH28_R_2, mode=Mode.SUBTRACT)
    # profile 2 of 6: a face of its own
    with BuildSketch(Plane.XY):
        with Locations(Location((58.681998756, 125.158, 0), (0, 0, 180))):
            Circle(SKETCH28_R)
        with Locations((58.681998756, 125.158)):
            Circle(SKETCH28_R_2, mode=Mode.SUBTRACT)
    # profile 3 of 6: a face of its own
    with BuildSketch(Plane.XY):
        with Locations(Location((86.113998756, 125.158, 0), (0, 0, 180))):
            Circle(SKETCH28_R)
        with Locations((86.113998756, 125.158)):
            Circle(SKETCH28_R_2, mode=Mode.SUBTRACT)
    # profile 4 of 6: a face of its own
    with BuildSketch(Plane.XY):
        with Locations(Location((32.265998756, 62.674, 0), (0, 0, 180))):
            Circle(SKETCH28_R)
        with Locations((32.265998756, 62.674)):
            Circle(SKETCH28_R_2, mode=Mode.SUBTRACT)
    # profile 5 of 6: a face of its own
    with BuildSketch(Plane.XY):
        with Locations(Location((58.681998756, 62.674, 0), (0, 0, 180))):
            Circle(SKETCH28_R)
        with Locations((58.681998756, 62.674)):
            Circle(SKETCH28_R_2, mode=Mode.SUBTRACT)
    # profile 6 of 6: a face of its own
    with BuildSketch(Plane.XY):
        with Locations(Location((86.113998756, 62.674, 0), (0, 0, 180))):
            Circle(SKETCH28_R)
        with Locations((86.113998756, 62.674)):
            Circle(SKETCH28_R_2, mode=Mode.SUBTRACT)
    extrude(amount=BOSS_EXTRUDE12_DEPTH)

    # Sketch29 → Cut-Extrude13 (cut)
    with BuildSketch(Plane.XZ.offset(-138.848000793)):
        with Locations(Location((39.377997498, 15, 0), (0, 0, 270))):
            Circle(SKETCH29_R)
    extrude(amount=-CUT_EXTRUDE13_DEPTH, mode=Mode.SUBTRACT)

    # Sketch30 → Cut-Extrude14 (cut)
    with BuildSketch(Plane.XY.offset(30)):
        with Locations((107.453697498, 96.348000793)):
            Circle(SKETCH30_R)
    extrude(amount=-CUT_EXTRUDE14_DEPTH, mode=Mode.SUBTRACT)


solid = part.part
